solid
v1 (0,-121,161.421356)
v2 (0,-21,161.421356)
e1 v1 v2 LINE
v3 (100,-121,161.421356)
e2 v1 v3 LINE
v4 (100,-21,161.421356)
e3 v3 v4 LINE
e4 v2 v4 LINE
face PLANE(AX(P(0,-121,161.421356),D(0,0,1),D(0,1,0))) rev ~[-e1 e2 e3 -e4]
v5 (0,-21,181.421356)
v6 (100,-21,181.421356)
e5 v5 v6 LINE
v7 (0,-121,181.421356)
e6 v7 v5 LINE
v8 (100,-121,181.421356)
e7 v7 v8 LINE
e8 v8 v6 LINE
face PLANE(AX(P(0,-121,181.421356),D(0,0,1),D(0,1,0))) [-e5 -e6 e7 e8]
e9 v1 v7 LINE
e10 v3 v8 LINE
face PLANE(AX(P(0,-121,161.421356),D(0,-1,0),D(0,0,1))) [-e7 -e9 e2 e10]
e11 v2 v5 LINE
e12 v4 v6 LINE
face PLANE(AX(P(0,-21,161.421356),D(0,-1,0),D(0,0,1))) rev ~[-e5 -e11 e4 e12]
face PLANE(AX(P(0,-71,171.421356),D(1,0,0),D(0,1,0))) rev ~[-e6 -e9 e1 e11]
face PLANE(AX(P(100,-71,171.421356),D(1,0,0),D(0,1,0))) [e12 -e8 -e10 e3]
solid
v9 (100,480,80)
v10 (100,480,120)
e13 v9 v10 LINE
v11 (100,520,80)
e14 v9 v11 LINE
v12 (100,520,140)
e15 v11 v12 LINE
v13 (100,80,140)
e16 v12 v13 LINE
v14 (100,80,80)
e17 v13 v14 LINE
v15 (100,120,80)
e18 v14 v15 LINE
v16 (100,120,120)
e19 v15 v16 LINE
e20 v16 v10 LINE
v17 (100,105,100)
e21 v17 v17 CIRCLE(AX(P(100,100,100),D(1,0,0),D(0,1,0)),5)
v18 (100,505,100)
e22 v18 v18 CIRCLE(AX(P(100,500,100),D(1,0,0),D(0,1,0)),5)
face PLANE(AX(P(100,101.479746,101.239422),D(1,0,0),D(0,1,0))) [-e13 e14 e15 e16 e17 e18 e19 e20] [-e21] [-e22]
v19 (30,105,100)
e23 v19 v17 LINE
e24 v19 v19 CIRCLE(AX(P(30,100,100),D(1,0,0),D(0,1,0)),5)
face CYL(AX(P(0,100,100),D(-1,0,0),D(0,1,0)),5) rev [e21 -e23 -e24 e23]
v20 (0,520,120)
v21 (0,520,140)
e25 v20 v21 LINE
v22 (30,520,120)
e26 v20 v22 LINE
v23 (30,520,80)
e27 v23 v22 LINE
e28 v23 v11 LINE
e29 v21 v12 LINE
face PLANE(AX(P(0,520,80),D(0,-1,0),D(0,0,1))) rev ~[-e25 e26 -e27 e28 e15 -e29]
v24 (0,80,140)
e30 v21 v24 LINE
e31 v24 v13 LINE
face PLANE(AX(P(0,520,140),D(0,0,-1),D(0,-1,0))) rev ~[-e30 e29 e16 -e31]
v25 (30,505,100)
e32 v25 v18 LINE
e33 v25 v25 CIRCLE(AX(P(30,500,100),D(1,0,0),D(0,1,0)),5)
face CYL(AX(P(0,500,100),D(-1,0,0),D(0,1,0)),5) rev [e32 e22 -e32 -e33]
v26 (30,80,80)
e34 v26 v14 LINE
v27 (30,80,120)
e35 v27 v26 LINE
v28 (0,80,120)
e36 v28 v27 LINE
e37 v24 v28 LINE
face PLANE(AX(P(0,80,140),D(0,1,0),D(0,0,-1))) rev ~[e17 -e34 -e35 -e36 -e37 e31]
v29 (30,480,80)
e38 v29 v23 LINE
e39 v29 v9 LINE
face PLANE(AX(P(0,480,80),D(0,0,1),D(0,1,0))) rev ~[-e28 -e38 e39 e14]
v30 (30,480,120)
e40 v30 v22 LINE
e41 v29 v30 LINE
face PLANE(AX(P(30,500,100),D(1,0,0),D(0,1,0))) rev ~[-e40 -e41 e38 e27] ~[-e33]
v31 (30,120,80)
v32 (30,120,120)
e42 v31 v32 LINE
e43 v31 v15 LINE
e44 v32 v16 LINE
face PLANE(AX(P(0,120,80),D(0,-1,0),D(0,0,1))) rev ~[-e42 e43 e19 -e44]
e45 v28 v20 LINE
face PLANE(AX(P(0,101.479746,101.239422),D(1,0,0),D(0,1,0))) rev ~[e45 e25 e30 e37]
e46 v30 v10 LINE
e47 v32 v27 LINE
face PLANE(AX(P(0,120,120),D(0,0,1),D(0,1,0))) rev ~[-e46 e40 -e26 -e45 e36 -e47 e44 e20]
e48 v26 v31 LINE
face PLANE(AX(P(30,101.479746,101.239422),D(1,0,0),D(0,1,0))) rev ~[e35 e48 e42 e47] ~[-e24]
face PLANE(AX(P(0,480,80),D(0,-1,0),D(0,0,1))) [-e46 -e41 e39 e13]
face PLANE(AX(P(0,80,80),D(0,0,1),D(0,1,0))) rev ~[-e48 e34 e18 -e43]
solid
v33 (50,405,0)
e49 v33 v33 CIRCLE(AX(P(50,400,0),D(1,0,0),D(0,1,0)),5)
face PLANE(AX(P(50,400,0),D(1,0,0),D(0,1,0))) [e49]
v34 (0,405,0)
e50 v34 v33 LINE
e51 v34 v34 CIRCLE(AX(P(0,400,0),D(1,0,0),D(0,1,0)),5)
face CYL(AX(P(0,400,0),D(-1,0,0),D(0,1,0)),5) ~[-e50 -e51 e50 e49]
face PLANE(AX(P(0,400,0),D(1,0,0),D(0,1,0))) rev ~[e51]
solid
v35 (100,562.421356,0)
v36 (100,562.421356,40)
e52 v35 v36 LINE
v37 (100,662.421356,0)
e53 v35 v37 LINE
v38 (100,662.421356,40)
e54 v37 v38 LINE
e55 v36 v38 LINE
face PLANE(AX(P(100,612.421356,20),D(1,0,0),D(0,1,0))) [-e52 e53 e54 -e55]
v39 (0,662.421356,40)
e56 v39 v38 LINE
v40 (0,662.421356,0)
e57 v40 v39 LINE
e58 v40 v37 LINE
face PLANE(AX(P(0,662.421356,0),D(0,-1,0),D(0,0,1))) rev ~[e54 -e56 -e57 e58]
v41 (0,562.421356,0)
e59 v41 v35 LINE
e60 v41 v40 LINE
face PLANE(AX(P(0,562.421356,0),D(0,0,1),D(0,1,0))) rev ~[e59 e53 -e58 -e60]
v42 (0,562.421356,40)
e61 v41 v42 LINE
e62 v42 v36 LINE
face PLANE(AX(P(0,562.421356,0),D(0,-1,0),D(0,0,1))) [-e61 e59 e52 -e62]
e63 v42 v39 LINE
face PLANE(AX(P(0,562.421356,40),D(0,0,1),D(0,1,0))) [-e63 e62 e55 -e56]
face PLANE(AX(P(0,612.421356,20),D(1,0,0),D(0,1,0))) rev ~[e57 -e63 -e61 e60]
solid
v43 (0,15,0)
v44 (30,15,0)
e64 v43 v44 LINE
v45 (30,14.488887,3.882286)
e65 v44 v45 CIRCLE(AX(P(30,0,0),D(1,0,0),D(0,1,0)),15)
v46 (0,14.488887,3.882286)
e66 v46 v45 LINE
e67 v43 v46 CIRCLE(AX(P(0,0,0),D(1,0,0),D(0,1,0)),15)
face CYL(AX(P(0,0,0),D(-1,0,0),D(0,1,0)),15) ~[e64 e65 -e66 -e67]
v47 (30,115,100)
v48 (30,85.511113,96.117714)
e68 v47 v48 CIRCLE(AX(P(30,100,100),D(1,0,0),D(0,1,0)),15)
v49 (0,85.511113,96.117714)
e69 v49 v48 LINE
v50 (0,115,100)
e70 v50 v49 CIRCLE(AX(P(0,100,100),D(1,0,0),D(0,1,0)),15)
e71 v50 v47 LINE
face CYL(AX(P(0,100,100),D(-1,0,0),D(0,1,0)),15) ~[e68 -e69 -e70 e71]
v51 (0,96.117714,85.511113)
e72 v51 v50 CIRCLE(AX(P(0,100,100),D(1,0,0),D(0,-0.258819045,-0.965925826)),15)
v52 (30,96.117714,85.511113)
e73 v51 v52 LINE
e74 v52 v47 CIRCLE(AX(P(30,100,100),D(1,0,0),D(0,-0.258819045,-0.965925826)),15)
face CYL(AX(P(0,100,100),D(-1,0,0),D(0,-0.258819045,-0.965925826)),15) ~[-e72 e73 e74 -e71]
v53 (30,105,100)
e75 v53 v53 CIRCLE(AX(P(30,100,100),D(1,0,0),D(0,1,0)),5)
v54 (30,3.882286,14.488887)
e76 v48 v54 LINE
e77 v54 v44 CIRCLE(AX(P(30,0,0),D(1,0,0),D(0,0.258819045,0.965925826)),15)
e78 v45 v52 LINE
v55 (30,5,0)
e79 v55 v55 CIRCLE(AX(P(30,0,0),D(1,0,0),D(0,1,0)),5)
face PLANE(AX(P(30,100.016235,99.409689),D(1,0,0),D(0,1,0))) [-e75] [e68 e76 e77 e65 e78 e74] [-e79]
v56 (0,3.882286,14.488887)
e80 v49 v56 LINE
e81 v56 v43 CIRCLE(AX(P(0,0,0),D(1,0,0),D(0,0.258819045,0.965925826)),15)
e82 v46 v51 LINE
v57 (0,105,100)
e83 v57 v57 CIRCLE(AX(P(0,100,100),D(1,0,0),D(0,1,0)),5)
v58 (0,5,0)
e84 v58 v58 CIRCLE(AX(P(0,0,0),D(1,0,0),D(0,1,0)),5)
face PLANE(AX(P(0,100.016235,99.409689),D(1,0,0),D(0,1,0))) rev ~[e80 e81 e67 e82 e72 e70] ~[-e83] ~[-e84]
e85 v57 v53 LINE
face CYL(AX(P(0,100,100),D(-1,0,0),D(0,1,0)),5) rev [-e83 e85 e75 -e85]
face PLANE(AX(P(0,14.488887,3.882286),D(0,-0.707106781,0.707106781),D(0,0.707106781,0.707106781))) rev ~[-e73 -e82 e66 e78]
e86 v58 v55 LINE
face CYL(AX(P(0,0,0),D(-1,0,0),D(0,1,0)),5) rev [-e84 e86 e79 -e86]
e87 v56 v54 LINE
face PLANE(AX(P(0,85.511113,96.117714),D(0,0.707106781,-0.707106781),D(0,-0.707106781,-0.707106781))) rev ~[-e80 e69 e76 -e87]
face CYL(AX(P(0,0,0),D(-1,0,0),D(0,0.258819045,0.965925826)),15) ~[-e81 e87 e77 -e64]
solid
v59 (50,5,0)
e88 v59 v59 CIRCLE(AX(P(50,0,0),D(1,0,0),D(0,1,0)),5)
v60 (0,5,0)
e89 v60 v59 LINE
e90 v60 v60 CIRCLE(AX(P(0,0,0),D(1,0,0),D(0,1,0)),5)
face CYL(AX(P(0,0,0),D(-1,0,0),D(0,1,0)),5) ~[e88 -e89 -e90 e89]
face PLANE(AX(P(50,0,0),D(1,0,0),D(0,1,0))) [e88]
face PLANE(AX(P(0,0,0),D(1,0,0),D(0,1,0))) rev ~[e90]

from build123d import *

# Parameters (mm, degrees)
F0_R     = 5
F0_W     = 40
F0_H     = 40
F1_DEPTH = 100
F2_DEPTH = 30
F3_DEPTH = 30
F0_W_2   = 100
F4_DEPTH = 100
F0_H_2   = 20
F5_DEPTH = 100
F6_DEPTH = 50


with BuildPart() as f1:
    # F0 (on Right) → F1 (new body)
    with BuildSketch(Plane.YZ):
        with BuildLine():
            Line((90.6066017178, 80), (120, 80))
            Line((120, 80), (120, 120))
            Line((120, 120), (80, 120))
            Line((80, 120), (80, 90.6066017178))
            Line((80, 90.6066017178), (85.5111126057, 96.1177143235))
            ThreePointArc((85.5111126057, 96.1177143235), (98.0421071167, 114.8716729206), (115, 100))
            ThreePointArc((115, 100), (109.1314214351, 88.0996998956), (96.1177143235, 85.5111126057))
            Line((96.1177143235, 85.5111126057), (90.6066017178, 80))
        make_face()
        with BuildLine():
            Line((80, 80), (90.6066017178, 80))
            Line((90.6066017178, 80), (96.1177143235, 85.5111126057))
            ThreePointArc((96.1177143235, 85.5111126057), (89.3933982822, 89.3933982822), (85.5111126057, 96.1177143235))
            Line((85.5111126057, 96.1177143235), (80, 90.6066017178))
            Line((80, 90.6066017178), (80, 80))
        make_face()
        with BuildLine():
            ThreePointArc((85.5111126057, 96.1177143235), (89.3933982822, 89.3933982822), (96.1177143235, 85.5111126057))
            ThreePointArc((96.1177143235, 85.5111126057), (109.1314214351, 88.0996998956), (115, 100))
            ThreePointArc((115, 100), (98.0421071167, 114.8716729206), (85.5111126057, 96.1177143235))
        make_face()
        with Locations((100, 100)):
            Circle(F0_R, mode=Mode.SUBTRACT)
        Polygon((80, 120), (120, 120), (480, 120), (520, 120), (520, 140), (80, 140), align=None)
        with Locations((500, 100)):
            Rectangle(F0_W, F0_H)
        with Locations((500, 100)):
            Circle(F0_R, mode=Mode.SUBTRACT)
    extrude(amount=F1_DEPTH)

    # F0 (on Right) → F3 (cut)
    with BuildSketch(Plane.YZ):
        with BuildLine():
            Line((90.6066017178, 80), (120, 80))
            Line((120, 80), (120, 120))
            Line((120, 120), (80, 120))
            Line((80, 120), (80, 90.6066017178))
            Line((80, 90.6066017178), (85.5111126057, 96.1177143235))
            ThreePointArc((85.5111126057, 96.1177143235), (98.0421071167, 114.8716729206), (115, 100))
            ThreePointArc((115, 100), (109.1314214351, 88.0996998956), (96.1177143235, 85.5111126057))
            Line((96.1177143235, 85.5111126057), (90.6066017178, 80))
        make_face()
        with BuildLine():
            ThreePointArc((85.5111126057, 96.1177143235), (89.3933982822, 89.3933982822), (96.1177143235, 85.5111126057))
            ThreePointArc((96.1177143235, 85.5111126057), (109.1314214351, 88.0996998956), (115, 100))
            ThreePointArc((115, 100), (98.0421071167, 114.8716729206), (85.5111126057, 96.1177143235))
        make_face()
        with Locations((100, 100)):
            Circle(F0_R, mode=Mode.SUBTRACT)
        with BuildLine():
            Line((80, 80), (90.6066017178, 80))
            Line((90.6066017178, 80), (96.1177143235, 85.5111126057))
            ThreePointArc((96.1177143235, 85.5111126057), (89.3933982822, 89.3933982822), (85.5111126057, 96.1177143235))
            Line((85.5111126057, 96.1177143235), (80, 90.6066017178))
            Line((80, 90.6066017178), (80, 80))
        make_face()
        with Locations((500, 100)):
            Rectangle(F0_W, F0_H)
        with Locations((500, 100)):
            Circle(F0_R, mode=Mode.SUBTRACT)
    extrude(amount=F3_DEPTH, mode=Mode.SUBTRACT)


with BuildPart() as f2:
    # F0 (on Right) → F2 (new body)
    with BuildSketch(Plane.YZ):
        with BuildLine():
            ThreePointArc((85.5111126057, 96.1177143235), (89.3933982822, 89.3933982822), (96.1177143235, 85.5111126057))
            ThreePointArc((96.1177143235, 85.5111126057), (109.1314214351, 88.0996998956), (115, 100))
            ThreePointArc((115, 100), (98.0421071167, 114.8716729206), (85.5111126057, 96.1177143235))
        make_face()
        with Locations((100, 100)):
            Circle(F0_R, mode=Mode.SUBTRACT)
        with BuildLine():
            Line((80, 80), (90.6066017178, 80))
            Line((90.6066017178, 80), (96.1177143235, 85.5111126057))
            ThreePointArc((96.1177143235, 85.5111126057), (89.3933982822, 89.3933982822), (85.5111126057, 96.1177143235))
            Line((85.5111126057, 96.1177143235), (80, 90.6066017178))
            Line((80, 90.6066017178), (80, 80))
        make_face()
        with BuildLine():
            Line((14.4888873943, 3.8822856765), (90.6066017178, 80))
            Line((90.6066017178, 80), (80, 80))
            Line((80, 80), (80, 90.6066017178))
            Line((80, 90.6066017178), (3.8822856765, 14.4888873943))
            ThreePointArc((3.8822856765, 14.4888873943), (10.6066017178, 10.6066017178), (14.4888873943, 3.8822856765))
        make_face()
        with BuildLine():
            ThreePointArc((15, 0), (14.8716729206, 1.9578928833), (14.4888873943, 3.8822856765))
            ThreePointArc((14.4888873943, 3.8822856765), (10.6066017178, 10.6066017178), (3.8822856765, 14.4888873943))
            ThreePointArc((3.8822856765, 14.4888873943), (-11.9003001044, -9.1314214351), (15, 0))
        make_face()
        Circle(F0_R, mode=Mode.SUBTRACT)
    extrude(amount=F2_DEPTH)


with BuildPart() as f4:
    # F0 (on Right) → F4 (new body)
    with BuildSketch(Plane.YZ):
        with Locations((612.4213562373, 20)):
            Rectangle(F0_W_2, F0_H)
    extrude(amount=F4_DEPTH)


with BuildPart() as f5:
    # F0 (on Right) → F5 (new body)
    with BuildSketch(Plane.YZ):
        with Locations((-71, 171.4213562373)):
            Rectangle(F0_W_2, F0_H_2)
    extrude(amount=F5_DEPTH)


with BuildPart() as f6:
    # F0 (on Right) → F6 (new body)
    with BuildSketch(Plane.YZ):
        Circle(F0_R)
    extrude(amount=F6_DEPTH)


with BuildPart() as f6b:
    # F0 (on Right) → F6, piece 2 (new body)
    with BuildSketch(Plane.YZ):
        with Locations((400, 0)):
            Circle(F0_R)
    extrude(amount=F6_DEPTH)


solid = Compound([f1.part, f2.part, f4.part, f5.part, f6.part, f6b.part])
